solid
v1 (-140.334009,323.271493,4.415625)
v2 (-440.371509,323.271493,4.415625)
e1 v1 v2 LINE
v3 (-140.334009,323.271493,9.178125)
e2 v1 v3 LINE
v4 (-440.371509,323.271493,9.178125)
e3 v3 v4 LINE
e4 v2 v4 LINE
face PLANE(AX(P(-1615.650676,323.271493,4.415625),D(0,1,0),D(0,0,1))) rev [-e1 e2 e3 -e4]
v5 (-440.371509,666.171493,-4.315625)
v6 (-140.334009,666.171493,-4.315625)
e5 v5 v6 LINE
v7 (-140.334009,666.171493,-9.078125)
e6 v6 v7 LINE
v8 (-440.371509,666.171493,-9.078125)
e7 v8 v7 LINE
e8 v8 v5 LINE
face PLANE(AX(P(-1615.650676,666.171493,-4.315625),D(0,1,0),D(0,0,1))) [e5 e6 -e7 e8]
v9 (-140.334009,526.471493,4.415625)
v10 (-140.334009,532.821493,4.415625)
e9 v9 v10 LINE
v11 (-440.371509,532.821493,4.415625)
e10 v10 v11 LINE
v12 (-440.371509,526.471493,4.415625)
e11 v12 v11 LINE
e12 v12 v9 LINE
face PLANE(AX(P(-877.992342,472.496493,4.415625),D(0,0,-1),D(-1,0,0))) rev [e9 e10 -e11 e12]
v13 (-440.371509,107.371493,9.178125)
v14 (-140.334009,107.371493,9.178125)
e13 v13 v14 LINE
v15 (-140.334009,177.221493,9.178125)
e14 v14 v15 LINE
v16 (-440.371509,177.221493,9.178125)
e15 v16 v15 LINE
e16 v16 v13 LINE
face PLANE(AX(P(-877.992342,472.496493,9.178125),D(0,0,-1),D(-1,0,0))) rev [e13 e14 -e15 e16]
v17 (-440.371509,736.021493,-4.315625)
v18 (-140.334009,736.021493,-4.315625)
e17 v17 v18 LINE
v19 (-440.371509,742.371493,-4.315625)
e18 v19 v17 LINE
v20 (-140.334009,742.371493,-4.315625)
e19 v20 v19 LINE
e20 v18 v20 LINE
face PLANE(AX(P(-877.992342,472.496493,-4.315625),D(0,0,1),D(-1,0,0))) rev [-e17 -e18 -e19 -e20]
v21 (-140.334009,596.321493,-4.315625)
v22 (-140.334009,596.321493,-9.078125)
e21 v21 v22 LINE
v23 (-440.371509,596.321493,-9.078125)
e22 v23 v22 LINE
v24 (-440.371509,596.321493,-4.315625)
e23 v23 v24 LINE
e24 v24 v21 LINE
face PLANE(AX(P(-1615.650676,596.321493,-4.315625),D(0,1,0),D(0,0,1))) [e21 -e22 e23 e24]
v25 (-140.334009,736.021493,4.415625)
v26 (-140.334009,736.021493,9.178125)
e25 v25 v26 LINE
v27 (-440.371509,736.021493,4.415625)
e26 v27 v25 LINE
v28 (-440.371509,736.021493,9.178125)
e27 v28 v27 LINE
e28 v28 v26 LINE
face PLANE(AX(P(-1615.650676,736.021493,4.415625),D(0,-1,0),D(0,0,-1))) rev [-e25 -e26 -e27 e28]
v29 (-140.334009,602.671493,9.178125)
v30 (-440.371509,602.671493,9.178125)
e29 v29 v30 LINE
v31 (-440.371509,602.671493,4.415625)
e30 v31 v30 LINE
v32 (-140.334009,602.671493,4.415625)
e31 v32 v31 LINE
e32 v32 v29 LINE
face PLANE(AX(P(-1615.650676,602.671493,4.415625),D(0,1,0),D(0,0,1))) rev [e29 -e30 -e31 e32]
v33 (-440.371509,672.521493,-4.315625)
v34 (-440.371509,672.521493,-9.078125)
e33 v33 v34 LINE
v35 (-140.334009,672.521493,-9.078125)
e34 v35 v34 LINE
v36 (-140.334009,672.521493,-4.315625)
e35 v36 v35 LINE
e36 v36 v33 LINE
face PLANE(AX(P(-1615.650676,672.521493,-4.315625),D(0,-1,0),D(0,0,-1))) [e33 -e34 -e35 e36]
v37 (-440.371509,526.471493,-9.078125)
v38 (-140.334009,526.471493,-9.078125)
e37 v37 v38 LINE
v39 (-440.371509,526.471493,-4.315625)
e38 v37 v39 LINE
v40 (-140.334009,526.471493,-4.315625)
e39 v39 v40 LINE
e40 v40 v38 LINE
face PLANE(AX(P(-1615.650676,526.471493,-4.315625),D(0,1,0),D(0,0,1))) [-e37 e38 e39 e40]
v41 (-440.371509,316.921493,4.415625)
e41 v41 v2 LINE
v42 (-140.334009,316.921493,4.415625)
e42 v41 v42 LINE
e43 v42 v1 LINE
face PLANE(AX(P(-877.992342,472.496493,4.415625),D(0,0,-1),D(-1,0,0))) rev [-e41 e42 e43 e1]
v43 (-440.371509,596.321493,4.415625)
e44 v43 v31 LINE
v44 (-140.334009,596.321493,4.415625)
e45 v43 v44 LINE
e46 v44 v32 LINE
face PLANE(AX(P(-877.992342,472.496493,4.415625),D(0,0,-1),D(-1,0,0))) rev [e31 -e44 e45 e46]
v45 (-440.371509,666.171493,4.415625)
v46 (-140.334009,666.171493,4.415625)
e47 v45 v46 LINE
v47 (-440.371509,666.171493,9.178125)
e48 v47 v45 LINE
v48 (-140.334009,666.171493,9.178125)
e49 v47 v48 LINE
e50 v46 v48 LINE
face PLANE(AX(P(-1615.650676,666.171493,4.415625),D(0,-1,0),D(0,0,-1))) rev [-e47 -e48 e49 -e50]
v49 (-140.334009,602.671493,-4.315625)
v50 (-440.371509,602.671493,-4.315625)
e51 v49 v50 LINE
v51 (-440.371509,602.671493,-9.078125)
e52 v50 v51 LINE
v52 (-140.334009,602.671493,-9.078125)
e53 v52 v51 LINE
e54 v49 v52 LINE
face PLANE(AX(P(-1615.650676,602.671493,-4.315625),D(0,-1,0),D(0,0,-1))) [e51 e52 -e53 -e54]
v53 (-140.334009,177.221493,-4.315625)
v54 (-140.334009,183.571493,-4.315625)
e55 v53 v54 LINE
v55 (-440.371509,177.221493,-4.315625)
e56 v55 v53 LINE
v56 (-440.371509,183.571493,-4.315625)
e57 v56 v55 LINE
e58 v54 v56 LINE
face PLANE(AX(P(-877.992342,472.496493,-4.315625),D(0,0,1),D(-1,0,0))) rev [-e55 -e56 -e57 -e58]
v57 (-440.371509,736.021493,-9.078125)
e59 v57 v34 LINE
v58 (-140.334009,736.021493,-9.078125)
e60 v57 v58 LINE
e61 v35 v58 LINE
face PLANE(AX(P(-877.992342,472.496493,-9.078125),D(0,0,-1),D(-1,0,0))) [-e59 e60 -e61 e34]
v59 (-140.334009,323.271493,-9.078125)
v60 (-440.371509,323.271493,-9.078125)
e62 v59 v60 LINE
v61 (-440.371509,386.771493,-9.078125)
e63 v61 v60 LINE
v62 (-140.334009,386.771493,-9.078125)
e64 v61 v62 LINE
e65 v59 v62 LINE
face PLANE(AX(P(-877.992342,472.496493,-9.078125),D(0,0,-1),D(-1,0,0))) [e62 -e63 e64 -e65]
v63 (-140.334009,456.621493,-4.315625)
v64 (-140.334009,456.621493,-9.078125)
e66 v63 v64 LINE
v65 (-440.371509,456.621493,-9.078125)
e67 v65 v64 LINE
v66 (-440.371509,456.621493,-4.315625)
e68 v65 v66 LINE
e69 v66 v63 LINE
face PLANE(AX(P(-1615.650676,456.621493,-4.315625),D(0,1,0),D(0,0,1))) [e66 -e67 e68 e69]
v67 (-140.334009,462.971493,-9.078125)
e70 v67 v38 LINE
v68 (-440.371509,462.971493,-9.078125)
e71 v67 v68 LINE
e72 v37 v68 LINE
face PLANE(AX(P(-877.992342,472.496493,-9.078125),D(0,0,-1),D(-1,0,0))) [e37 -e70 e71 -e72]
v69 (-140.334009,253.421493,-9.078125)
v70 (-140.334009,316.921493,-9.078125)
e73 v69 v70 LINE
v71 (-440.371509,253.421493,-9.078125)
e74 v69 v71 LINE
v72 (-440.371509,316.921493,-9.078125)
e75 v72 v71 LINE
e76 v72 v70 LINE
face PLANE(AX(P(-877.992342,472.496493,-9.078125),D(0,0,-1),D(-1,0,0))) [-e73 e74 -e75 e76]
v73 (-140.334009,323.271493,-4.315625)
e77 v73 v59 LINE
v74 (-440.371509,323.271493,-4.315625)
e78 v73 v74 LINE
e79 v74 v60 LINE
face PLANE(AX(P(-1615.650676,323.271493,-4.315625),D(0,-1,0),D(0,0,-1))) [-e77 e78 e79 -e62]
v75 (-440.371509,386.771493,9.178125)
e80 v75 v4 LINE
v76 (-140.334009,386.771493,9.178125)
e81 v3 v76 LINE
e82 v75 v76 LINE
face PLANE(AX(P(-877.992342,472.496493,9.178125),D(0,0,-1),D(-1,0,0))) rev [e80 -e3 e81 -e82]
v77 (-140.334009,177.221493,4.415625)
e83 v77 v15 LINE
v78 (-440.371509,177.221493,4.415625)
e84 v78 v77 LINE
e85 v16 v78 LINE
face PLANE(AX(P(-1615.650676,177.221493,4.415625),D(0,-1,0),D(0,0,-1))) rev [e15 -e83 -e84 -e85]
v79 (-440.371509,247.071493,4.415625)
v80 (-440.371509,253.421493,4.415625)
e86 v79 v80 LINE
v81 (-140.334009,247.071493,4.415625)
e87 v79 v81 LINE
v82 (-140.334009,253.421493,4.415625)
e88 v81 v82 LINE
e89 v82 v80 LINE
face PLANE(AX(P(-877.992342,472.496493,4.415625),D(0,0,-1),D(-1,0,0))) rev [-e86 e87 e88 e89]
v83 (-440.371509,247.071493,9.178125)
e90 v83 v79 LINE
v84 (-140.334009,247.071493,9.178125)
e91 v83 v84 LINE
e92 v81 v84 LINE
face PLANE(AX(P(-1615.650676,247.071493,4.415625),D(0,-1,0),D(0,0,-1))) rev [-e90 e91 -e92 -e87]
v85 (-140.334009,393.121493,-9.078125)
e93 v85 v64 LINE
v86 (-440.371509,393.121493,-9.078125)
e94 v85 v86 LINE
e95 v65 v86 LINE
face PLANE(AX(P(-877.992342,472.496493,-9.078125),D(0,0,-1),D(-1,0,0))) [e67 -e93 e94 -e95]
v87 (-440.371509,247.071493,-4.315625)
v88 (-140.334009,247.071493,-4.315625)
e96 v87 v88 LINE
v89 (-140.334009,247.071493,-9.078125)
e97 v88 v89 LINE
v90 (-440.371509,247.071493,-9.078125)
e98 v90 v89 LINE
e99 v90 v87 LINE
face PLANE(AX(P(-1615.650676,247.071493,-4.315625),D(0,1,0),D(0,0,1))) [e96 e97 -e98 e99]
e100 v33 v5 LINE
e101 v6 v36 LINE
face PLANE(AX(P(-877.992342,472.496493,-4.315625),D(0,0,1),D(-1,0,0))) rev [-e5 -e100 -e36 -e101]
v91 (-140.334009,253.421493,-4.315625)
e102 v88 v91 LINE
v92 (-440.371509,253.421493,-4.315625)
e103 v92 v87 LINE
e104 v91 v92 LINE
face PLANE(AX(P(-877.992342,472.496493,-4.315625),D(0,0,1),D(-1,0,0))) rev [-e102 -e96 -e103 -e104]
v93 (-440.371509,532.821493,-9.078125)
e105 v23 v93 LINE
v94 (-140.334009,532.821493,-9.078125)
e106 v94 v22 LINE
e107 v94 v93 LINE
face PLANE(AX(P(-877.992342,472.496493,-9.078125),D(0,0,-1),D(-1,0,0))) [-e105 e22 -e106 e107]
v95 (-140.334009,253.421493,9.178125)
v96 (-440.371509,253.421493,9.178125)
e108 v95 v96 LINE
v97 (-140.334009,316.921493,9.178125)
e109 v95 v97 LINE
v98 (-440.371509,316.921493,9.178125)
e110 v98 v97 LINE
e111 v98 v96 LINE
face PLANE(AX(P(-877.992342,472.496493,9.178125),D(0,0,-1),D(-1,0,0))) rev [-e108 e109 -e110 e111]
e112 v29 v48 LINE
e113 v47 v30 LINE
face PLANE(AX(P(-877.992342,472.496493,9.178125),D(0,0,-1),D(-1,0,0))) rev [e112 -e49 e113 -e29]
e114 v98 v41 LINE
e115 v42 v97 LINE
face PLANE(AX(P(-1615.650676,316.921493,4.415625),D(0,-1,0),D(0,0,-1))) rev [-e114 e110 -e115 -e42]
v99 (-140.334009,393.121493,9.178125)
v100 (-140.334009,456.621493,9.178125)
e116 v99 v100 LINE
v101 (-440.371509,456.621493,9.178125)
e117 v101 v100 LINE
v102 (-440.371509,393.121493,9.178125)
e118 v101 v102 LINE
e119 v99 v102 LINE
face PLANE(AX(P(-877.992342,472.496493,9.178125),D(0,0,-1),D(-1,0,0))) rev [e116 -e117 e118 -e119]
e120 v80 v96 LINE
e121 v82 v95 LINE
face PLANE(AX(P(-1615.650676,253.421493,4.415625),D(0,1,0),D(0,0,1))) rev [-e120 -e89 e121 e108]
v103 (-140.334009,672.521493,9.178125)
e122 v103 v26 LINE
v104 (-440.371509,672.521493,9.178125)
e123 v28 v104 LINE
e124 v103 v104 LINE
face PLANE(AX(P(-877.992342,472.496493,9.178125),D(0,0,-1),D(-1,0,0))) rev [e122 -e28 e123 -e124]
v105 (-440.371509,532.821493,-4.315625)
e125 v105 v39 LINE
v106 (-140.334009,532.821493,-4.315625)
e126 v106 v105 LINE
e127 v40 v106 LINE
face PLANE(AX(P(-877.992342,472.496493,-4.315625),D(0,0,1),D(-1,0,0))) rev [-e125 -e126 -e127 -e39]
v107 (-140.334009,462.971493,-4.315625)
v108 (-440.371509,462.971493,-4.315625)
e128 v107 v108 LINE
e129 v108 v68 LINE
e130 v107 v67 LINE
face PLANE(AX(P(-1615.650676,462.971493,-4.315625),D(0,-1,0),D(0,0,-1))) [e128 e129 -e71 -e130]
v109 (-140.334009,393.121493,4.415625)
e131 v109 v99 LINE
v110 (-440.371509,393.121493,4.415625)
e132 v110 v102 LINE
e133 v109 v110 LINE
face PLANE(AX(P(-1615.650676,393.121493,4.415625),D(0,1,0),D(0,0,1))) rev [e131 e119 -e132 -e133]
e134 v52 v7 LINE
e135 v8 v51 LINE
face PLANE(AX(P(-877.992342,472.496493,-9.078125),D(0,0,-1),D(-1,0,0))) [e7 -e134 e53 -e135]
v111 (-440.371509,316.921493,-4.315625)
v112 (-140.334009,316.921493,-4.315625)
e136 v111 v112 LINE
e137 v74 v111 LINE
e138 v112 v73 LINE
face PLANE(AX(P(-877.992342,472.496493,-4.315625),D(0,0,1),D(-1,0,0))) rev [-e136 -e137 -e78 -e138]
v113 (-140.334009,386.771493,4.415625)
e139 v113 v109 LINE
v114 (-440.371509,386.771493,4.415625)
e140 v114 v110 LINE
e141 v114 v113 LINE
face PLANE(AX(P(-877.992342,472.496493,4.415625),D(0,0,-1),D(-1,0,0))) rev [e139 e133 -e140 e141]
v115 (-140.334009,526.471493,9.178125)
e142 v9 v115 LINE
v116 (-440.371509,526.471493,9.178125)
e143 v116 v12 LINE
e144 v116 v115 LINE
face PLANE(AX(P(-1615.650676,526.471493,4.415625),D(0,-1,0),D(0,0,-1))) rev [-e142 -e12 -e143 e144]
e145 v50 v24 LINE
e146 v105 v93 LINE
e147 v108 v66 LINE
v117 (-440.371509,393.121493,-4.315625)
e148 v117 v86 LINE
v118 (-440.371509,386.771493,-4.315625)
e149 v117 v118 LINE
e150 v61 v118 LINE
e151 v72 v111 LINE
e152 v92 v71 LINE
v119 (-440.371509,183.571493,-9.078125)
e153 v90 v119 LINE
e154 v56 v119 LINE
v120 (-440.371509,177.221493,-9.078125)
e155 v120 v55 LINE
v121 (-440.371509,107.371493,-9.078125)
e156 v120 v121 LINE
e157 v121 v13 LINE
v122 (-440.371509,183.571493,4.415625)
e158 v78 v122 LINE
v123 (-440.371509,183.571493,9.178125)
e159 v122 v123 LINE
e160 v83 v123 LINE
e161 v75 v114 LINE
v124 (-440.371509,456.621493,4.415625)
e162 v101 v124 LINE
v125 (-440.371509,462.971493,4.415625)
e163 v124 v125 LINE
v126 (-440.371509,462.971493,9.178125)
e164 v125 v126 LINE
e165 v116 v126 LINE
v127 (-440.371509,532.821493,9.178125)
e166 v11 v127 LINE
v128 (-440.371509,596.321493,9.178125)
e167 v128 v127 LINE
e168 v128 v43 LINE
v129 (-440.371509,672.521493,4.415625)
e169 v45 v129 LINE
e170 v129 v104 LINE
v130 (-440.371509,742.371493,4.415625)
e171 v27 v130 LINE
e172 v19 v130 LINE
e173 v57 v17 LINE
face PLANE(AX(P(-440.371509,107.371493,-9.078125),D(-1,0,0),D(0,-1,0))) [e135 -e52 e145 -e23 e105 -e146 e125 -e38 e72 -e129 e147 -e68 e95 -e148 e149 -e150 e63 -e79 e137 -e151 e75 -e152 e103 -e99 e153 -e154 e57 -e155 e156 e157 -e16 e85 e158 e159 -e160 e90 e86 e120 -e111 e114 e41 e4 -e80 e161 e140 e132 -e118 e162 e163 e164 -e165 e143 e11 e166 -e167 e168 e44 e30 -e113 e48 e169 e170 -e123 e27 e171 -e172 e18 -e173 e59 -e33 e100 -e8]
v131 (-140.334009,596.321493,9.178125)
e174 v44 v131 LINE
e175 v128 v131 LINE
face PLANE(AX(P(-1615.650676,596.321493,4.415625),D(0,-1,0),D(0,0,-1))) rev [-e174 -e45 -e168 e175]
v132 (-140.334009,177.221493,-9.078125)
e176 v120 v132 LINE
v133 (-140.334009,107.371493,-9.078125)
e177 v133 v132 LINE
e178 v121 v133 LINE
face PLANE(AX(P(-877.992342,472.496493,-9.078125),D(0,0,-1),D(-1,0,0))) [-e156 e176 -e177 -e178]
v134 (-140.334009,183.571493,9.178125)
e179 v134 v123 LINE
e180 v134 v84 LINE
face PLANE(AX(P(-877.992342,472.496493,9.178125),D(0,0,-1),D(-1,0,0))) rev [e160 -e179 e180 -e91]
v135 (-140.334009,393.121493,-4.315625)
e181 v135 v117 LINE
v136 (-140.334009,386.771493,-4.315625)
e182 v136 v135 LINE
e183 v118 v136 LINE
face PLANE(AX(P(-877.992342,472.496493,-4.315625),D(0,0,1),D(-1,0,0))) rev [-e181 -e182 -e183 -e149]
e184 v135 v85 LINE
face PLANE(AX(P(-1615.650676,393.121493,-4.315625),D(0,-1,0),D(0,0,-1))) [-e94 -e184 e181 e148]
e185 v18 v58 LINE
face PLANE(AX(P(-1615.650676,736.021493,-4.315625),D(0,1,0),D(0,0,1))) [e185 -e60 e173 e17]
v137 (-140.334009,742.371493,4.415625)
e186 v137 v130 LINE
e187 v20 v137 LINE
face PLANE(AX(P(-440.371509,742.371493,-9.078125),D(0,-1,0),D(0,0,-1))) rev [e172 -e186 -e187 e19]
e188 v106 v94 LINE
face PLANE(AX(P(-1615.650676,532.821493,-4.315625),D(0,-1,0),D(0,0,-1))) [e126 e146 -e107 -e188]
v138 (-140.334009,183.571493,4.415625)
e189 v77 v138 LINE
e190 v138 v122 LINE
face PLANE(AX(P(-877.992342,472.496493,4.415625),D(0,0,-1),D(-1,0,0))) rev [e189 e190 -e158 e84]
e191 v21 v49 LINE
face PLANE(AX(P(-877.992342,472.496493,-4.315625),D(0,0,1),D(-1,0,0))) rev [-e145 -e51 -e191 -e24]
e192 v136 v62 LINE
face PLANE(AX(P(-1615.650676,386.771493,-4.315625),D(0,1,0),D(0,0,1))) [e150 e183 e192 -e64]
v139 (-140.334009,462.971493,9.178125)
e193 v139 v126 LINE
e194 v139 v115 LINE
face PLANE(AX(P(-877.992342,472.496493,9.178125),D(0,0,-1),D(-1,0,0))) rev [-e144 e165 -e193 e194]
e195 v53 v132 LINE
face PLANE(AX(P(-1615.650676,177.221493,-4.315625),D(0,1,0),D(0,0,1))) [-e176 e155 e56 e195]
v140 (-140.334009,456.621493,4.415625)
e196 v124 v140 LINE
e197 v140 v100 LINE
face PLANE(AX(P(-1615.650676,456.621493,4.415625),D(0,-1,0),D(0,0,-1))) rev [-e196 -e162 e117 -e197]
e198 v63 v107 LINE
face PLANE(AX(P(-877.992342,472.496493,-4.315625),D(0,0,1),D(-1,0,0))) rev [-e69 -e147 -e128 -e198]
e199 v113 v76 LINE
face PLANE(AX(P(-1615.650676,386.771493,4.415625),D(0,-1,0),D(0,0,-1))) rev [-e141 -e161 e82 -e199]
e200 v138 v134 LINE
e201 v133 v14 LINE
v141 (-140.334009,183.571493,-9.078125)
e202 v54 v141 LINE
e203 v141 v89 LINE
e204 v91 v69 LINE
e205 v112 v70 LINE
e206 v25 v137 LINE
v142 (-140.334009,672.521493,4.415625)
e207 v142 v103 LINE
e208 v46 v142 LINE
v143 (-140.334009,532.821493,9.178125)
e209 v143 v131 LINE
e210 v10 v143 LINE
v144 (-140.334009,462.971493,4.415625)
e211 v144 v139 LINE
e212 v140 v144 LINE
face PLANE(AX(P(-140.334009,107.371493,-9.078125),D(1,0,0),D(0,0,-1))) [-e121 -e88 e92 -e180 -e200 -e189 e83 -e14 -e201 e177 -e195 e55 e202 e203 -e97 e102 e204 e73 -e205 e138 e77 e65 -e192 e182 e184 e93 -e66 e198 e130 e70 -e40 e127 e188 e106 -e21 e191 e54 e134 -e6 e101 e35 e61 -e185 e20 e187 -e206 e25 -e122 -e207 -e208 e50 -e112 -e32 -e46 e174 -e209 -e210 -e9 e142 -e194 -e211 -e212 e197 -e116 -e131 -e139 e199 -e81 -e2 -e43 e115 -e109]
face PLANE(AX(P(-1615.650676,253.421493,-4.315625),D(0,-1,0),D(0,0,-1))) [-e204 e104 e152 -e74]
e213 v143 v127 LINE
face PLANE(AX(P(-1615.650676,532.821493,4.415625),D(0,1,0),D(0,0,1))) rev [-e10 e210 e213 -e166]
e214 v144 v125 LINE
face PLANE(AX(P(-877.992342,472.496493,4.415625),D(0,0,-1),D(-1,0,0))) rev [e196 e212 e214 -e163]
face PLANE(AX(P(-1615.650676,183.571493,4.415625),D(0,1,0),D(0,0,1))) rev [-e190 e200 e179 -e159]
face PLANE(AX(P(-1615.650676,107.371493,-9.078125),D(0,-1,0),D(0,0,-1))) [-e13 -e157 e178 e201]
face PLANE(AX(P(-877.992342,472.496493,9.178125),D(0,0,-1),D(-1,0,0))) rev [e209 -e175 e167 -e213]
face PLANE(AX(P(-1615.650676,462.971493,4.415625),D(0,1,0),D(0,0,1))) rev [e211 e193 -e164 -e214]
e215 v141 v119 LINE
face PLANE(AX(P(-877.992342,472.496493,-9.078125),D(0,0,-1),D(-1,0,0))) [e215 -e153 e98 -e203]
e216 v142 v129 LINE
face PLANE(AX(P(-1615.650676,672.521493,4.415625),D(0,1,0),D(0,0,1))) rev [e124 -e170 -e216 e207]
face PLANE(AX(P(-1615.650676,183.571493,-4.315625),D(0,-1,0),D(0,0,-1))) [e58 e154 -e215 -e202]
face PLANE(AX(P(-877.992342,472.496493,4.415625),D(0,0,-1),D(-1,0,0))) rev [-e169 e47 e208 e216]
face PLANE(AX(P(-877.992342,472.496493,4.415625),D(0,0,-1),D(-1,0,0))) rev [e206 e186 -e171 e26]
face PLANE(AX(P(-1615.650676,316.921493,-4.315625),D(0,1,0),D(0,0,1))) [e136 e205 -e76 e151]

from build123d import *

# Parameters (mm, degrees)
PARTSCAB_REFERENCE_START = -1615.650675561
PARTSCAB_REFERENCE_DEPTH = 1475.316666667
SKETCH1_OUTSIDE_W        = 1806.569
SKETCH1_OUTSIDE_H        = 1061.502
SKETCH1_OUTSIDE_W_2      = 300.0375
SKETCH1_OUTSIDE_H_2      = 730.25
CUT_EXTRUDE1_DEPTH       = 1820.964329577
SKETCH2_W                = 300.0375
SKETCH2_H                = 95.25
CUT_EXTRUDE2_DEPTH       = 947.50415812


# Read off the part's stored shape, not the designer's step: PartsCab_Reference
with BuildPart() as part:
    # PartsCab_Reference outline → PartsCab_Reference (new body)
    with BuildSketch(Plane.YZ.offset(PARTSCAB_REFERENCE_START)):
        Polygon((107.371492578, 9.178125), (107.371492578, -9.078125), (177.221492578, -9.078125), (177.221492578, -4.315625), (183.571492578, -4.315625), (183.571492578, -9.078125), (247.071492578, -9.078125), (247.071492578, -4.315625), (253.421492578, -4.315625), (253.421492578, -9.078125), (316.921492578, -9.078125), (316.921492578, -4.315625), (323.271492578, -4.315625), (323.271492578, -9.078125), (386.771492578, -9.078125), (386.771492578, -4.315625), (393.121492578, -4.315625), (393.121492578, -9.078125), (456.621492578, -9.078125), (456.621492578, -4.315625), (462.971492578, -4.315625), (462.971492578, -9.078125), (526.471492578, -9.078125), (526.471492578, -4.315625), (532.821492578, -4.315625), (532.821492578, -9.078125), (596.321492578, -9.078125), (596.321492578, -4.315625), (602.671492578, -4.315625), (602.671492578, -9.078125), (666.171492578, -9.078125), (666.171492578, -4.315625), (672.521492578, -4.315625), (672.521492578, -9.078125), (736.021492578, -9.078125), (736.021492578, -4.315625), (742.371492578, -4.315625), (742.371492578, -9.078125), (837.621492578, -9.078125), (837.621492578, 9.178125), (742.371492578, 9.178125), (742.371492578, 4.415625), (736.021492578, 4.415625), (736.021492578, 9.178125), (672.521492578, 9.178125), (672.521492578, 4.415625), (666.171492578, 4.415625), (666.171492578, 9.178125), (602.671492578, 9.178125), (602.671492578, 4.415625), (596.321492578, 4.415625), (596.321492578, 9.178125), (532.821492578, 9.178125), (532.821492578, 4.415625), (526.471492578, 4.415625), (526.471492578, 9.178125), (462.971492578, 9.178125), (462.971492578, 4.415625), (456.621492578, 4.415625), (456.621492578, 9.178125), (393.121492578, 9.178125), (393.121492578, 4.415625), (386.771492578, 4.415625), (386.771492578, 9.178125), (323.271492578, 9.178125), (323.271492578, 4.415625), (316.921492578, 4.415625), (316.921492578, 9.178125), (253.421492578, 9.178125), (253.421492578, 4.415625), (247.071492578, 4.415625), (247.071492578, 9.178125), (183.571492578, 9.178125), (183.571492578, 4.415625), (177.221492578, 4.415625), (177.221492578, 9.178125), align=None)
    extrude(amount=PARTSCAB_REFERENCE_DEPTH)

    # Sketch1 outside → Cut-Extrude1 (cut, through all)
    with BuildSketch(Plane.XY.offset(9.178125)):
        with Locations((-877.9925, 472.496)):
            Rectangle(SKETCH1_OUTSIDE_W, SKETCH1_OUTSIDE_H)
        with Locations((-290.352758894, 472.496492578)):
            Rectangle(SKETCH1_OUTSIDE_W_2, SKETCH1_OUTSIDE_H_2, mode=Mode.SUBTRACT)
    extrude(amount=-CUT_EXTRUDE1_DEPTH, mode=Mode.SUBTRACT)

    # Sketch2 → Cut-Extrude2 (cut, through all)
    with BuildSketch(Plane.XY.offset(9.178125)):
        with Locations((-290.352758894, 789.996492578)):
            Rectangle(SKETCH2_W, SKETCH2_H)
    extrude(amount=-CUT_EXTRUDE2_DEPTH, mode=Mode.SUBTRACT)


solid = part.part
